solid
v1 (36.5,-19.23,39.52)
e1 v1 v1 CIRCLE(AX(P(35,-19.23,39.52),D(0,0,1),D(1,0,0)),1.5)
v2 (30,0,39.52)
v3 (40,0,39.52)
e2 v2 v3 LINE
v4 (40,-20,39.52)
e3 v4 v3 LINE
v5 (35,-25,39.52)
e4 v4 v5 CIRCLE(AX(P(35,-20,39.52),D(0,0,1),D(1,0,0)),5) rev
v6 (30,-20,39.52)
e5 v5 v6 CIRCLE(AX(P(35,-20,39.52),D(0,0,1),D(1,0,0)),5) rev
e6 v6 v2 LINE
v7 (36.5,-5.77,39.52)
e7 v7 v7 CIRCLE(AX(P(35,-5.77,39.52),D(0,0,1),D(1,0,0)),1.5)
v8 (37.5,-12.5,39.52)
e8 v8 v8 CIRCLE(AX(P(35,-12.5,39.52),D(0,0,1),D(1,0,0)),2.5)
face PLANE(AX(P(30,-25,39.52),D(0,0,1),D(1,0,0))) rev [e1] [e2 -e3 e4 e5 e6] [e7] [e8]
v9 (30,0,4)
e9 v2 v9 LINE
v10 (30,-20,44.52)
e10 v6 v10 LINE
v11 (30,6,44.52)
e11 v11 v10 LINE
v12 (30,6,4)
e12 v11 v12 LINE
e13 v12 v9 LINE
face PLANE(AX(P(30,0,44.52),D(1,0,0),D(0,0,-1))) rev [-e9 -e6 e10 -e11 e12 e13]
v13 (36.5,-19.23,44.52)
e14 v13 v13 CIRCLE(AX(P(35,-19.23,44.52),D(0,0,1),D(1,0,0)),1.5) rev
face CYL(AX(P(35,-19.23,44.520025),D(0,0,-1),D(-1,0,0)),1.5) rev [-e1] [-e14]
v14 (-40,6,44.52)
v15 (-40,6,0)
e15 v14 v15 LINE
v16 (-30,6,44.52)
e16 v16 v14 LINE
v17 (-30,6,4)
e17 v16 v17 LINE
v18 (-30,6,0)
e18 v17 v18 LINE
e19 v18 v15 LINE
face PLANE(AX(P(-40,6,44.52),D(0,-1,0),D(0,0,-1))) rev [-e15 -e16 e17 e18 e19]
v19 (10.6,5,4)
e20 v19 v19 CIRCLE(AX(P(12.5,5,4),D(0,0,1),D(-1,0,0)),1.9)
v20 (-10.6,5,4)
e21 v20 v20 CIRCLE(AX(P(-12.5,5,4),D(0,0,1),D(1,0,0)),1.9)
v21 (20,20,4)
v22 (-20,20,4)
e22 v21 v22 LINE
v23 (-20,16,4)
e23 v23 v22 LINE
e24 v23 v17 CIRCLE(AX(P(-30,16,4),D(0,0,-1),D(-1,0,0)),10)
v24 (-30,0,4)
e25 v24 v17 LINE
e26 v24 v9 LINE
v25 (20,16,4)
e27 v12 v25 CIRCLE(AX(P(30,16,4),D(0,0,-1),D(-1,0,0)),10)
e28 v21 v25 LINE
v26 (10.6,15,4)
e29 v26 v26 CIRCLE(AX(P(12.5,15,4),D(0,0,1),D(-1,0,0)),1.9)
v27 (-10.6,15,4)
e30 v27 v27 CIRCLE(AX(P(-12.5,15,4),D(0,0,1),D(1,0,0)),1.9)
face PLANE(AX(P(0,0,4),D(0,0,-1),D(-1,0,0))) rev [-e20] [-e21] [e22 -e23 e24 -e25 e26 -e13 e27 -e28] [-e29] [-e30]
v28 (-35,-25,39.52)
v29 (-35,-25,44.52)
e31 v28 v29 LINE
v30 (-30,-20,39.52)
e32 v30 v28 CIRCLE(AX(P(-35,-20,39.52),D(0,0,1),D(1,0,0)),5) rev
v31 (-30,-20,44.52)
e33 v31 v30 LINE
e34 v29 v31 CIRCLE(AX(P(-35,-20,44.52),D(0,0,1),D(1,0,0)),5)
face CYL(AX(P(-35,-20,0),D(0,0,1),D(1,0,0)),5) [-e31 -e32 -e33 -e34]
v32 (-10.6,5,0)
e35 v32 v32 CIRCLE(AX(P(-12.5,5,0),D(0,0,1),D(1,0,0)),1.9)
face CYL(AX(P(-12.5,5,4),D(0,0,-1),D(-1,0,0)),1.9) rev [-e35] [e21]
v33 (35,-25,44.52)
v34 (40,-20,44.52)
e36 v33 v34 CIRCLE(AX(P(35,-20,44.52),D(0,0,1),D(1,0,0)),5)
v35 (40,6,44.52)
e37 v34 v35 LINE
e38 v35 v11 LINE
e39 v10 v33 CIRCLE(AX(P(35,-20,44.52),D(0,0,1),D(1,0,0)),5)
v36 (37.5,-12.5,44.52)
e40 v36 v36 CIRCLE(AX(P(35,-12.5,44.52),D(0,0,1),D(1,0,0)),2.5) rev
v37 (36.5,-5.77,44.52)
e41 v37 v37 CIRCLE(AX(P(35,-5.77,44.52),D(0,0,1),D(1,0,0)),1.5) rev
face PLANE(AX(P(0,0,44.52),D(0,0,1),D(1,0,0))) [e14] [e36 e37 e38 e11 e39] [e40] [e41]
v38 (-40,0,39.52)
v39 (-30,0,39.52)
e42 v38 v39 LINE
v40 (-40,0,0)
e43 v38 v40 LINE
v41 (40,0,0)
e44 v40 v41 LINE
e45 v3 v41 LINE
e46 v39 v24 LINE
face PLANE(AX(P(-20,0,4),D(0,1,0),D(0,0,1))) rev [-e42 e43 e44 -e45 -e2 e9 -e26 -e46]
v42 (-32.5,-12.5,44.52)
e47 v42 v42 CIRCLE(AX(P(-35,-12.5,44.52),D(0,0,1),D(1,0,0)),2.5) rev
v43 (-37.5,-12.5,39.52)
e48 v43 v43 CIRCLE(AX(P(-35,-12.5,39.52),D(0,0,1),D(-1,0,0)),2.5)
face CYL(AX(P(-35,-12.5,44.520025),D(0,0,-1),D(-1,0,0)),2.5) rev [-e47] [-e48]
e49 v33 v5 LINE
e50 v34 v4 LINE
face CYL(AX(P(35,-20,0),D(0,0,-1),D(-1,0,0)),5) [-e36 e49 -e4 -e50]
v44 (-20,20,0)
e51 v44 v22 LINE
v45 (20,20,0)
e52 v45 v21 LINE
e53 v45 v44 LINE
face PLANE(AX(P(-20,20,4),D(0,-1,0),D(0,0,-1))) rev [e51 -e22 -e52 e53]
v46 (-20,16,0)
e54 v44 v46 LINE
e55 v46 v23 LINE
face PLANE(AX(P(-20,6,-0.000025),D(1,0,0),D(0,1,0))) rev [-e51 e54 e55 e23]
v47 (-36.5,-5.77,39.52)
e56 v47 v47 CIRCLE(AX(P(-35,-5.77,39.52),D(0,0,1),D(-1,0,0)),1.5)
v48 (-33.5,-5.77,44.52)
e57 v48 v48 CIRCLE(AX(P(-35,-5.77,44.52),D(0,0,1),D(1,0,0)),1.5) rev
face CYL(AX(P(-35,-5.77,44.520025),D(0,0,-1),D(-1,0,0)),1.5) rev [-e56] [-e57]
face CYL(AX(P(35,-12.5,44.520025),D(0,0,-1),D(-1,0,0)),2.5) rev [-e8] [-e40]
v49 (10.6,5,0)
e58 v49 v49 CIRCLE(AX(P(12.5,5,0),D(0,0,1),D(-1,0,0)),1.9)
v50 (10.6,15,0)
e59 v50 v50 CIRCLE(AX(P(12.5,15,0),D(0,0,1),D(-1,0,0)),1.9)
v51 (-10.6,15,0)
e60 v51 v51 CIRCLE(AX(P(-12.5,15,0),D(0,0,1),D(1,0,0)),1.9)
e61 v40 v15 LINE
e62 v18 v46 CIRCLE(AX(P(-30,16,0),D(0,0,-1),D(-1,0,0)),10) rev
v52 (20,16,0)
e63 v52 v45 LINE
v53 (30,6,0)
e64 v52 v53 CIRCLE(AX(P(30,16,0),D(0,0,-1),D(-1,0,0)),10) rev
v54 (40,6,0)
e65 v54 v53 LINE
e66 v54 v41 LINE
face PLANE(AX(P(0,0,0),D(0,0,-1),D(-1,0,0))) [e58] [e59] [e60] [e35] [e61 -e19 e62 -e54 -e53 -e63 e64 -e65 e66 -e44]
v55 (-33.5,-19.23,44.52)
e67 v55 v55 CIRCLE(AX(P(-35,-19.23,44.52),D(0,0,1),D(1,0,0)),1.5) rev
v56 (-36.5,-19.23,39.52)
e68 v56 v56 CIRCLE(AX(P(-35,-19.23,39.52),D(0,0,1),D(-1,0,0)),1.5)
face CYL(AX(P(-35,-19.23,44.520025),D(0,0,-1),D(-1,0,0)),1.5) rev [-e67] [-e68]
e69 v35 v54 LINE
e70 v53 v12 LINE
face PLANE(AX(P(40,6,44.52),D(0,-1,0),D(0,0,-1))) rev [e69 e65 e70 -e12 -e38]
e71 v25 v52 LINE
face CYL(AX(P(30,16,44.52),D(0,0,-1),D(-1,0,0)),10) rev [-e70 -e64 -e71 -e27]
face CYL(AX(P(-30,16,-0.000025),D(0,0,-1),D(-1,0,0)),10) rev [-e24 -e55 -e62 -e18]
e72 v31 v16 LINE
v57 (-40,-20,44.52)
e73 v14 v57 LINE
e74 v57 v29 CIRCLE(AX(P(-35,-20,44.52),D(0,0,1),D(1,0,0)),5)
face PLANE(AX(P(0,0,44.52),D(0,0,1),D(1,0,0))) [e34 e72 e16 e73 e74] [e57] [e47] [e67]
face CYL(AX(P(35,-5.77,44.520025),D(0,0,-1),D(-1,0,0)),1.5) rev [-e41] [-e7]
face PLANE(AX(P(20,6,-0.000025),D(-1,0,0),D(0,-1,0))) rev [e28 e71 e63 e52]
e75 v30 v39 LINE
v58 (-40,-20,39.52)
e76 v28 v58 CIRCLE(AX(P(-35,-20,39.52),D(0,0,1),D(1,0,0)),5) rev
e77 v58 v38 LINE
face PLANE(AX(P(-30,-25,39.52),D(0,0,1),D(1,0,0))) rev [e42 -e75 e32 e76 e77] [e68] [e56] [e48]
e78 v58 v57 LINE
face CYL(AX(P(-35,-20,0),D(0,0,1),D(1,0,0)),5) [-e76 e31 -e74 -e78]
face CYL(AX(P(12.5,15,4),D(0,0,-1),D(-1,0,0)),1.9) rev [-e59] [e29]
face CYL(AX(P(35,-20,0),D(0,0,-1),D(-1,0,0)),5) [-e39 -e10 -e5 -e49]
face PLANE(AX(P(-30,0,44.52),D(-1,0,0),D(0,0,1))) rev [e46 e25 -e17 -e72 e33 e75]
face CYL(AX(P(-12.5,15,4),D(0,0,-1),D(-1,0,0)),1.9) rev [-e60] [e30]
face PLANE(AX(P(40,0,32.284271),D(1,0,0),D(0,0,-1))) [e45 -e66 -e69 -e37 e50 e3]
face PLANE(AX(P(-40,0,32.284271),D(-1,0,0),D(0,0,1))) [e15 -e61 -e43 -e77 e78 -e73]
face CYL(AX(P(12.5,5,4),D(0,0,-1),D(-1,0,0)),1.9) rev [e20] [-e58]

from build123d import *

# Parameters (mm, degrees)
SKETCH1_W           = 40
SKETCH1_H           = 20
SKETCH1_R           = 1.9
MAIN_MOUNTING_DEPTH = 4
SKETCH2_W           = 20
SKETCH2_H           = 20
EXTENTION_DEPTH     = 4
SKETCH3_W           = 10
SKETCH3_H           = 6
BOSS_EXTRUDE3_DEPTH = 40.52
SKETCH4_W           = 10
SKETCH4_H           = 5
BOSS_EXTRUDE4_DEPTH = 25
SKETCH5_R           = 1.5
SKETCH5_R_2         = 2.5
CUT_EXTRUDE1_DEPTH  = 62.537227757
SKETCH7_W           = 20
SKETCH7_H           = 14
CUT_EXTRUDE2_DEPTH  = 63.184165187
FILLET1_R           = 10
FILLET2_R           = 5


with BuildPart() as part:
    # Sketch1 → main mounting (new body)
    with BuildSketch(Plane.XY):
        with Locations((0, 10)):
            Rectangle(SKETCH1_W, SKETCH1_H)
        with Locations((-12.5, 15)):
            Circle(SKETCH1_R, mode=Mode.SUBTRACT)
        with Locations((-12.5, 5)):
            Circle(SKETCH1_R, mode=Mode.SUBTRACT)
        with Locations(Location((12.5, 5, 0), (0, 0, 180))):
            Circle(SKETCH1_R, mode=Mode.SUBTRACT)
        with Locations(Location((12.5, 15, 0), (0, 0, 180))):
            Circle(SKETCH1_R, mode=Mode.SUBTRACT)
    extrude(amount=MAIN_MOUNTING_DEPTH)

    # Sketch2 → extention (add)
    with BuildSketch(Plane(origin=(0, 0, 0), x_dir=(-1, 0, 0), z_dir=(0, 0, -1))):
        with Locations((30, 10)):
            Rectangle(SKETCH2_W, SKETCH2_H)
        with Locations((-30, 10)):
            Rectangle(SKETCH2_W, SKETCH2_H)
    extrude(amount=-EXTENTION_DEPTH)

    # Sketch3 → Boss-Extrude3 (add)
    with BuildSketch(Plane.XY.offset(4)):
        with Locations((-35, 3)):
            Rectangle(SKETCH3_W, SKETCH3_H)
        with Locations((35, 3)):
            Rectangle(SKETCH3_W, SKETCH3_H)
    extrude(amount=BOSS_EXTRUDE3_DEPTH)

    # Sketch4 → Boss-Extrude4 (add)
    with BuildSketch(Plane.XZ):
        with Locations((-35, 42.02)):
            Rectangle(SKETCH4_W, SKETCH4_H)
        with Locations((35, 42.02)):
            Rectangle(SKETCH4_W, SKETCH4_H)
    extrude(amount=BOSS_EXTRUDE4_DEPTH)

    # Sketch5 → Cut-Extrude1 (cut, through all)
    with BuildSketch(Plane(origin=(0, 0, 39.52), x_dir=(-1, 0, 0), z_dir=(0, 0, 1))):
        with Locations((35, 19.23)):
            Circle(SKETCH5_R)
        with Locations((35, 5.77)):
            Circle(SKETCH5_R)
        with Locations(Location((-35, 12.5, 0), (0, 0, 180))):
            Circle(SKETCH5_R_2)
        with Locations((35, 12.5)):
            Circle(SKETCH5_R_2)
        with Locations(Location((-35, 5.77, 0), (0, 0, 180))):
            Circle(SKETCH5_R)
        with Locations(Location((-35, 19.23, 0), (0, 0, 180))):
            Circle(SKETCH5_R)
    extrude(amount=CUT_EXTRUDE1_DEPTH, mode=Mode.SUBTRACT)

    # Sketch7 → Cut-Extrude2 (cut, through all)
    with BuildSketch(Plane.XY.offset(4)):
        with Locations((-30, 13)):
            Rectangle(SKETCH7_W, SKETCH7_H)
        with Locations((30, 13)):
            Rectangle(SKETCH7_W, SKETCH7_H)
    extrude(amount=-CUT_EXTRUDE2_DEPTH, mode=Mode.SUBTRACT)

    # Fillet1
    fillet1_edges = [part.edges().sort_by_distance(p)[0] for p in [
        (20, 6, 2),
        (-20, 6, 2),
    ]]
    fillet(fillet1_edges, radius=FILLET1_R)

    # Fillet2
    fillet2_edges = [part.edges().sort_by_distance(p)[0] for p in [
        (40, -25, 42.02),
        (30, -25, 42.02),
        (-40, -25, 42.02),
        (-30, -25, 42.02),
    ]]
    fillet(fillet2_edges, radius=FILLET2_R - 0.0001)  # a hair under: the kernel refuses the full size


solid = part.part
